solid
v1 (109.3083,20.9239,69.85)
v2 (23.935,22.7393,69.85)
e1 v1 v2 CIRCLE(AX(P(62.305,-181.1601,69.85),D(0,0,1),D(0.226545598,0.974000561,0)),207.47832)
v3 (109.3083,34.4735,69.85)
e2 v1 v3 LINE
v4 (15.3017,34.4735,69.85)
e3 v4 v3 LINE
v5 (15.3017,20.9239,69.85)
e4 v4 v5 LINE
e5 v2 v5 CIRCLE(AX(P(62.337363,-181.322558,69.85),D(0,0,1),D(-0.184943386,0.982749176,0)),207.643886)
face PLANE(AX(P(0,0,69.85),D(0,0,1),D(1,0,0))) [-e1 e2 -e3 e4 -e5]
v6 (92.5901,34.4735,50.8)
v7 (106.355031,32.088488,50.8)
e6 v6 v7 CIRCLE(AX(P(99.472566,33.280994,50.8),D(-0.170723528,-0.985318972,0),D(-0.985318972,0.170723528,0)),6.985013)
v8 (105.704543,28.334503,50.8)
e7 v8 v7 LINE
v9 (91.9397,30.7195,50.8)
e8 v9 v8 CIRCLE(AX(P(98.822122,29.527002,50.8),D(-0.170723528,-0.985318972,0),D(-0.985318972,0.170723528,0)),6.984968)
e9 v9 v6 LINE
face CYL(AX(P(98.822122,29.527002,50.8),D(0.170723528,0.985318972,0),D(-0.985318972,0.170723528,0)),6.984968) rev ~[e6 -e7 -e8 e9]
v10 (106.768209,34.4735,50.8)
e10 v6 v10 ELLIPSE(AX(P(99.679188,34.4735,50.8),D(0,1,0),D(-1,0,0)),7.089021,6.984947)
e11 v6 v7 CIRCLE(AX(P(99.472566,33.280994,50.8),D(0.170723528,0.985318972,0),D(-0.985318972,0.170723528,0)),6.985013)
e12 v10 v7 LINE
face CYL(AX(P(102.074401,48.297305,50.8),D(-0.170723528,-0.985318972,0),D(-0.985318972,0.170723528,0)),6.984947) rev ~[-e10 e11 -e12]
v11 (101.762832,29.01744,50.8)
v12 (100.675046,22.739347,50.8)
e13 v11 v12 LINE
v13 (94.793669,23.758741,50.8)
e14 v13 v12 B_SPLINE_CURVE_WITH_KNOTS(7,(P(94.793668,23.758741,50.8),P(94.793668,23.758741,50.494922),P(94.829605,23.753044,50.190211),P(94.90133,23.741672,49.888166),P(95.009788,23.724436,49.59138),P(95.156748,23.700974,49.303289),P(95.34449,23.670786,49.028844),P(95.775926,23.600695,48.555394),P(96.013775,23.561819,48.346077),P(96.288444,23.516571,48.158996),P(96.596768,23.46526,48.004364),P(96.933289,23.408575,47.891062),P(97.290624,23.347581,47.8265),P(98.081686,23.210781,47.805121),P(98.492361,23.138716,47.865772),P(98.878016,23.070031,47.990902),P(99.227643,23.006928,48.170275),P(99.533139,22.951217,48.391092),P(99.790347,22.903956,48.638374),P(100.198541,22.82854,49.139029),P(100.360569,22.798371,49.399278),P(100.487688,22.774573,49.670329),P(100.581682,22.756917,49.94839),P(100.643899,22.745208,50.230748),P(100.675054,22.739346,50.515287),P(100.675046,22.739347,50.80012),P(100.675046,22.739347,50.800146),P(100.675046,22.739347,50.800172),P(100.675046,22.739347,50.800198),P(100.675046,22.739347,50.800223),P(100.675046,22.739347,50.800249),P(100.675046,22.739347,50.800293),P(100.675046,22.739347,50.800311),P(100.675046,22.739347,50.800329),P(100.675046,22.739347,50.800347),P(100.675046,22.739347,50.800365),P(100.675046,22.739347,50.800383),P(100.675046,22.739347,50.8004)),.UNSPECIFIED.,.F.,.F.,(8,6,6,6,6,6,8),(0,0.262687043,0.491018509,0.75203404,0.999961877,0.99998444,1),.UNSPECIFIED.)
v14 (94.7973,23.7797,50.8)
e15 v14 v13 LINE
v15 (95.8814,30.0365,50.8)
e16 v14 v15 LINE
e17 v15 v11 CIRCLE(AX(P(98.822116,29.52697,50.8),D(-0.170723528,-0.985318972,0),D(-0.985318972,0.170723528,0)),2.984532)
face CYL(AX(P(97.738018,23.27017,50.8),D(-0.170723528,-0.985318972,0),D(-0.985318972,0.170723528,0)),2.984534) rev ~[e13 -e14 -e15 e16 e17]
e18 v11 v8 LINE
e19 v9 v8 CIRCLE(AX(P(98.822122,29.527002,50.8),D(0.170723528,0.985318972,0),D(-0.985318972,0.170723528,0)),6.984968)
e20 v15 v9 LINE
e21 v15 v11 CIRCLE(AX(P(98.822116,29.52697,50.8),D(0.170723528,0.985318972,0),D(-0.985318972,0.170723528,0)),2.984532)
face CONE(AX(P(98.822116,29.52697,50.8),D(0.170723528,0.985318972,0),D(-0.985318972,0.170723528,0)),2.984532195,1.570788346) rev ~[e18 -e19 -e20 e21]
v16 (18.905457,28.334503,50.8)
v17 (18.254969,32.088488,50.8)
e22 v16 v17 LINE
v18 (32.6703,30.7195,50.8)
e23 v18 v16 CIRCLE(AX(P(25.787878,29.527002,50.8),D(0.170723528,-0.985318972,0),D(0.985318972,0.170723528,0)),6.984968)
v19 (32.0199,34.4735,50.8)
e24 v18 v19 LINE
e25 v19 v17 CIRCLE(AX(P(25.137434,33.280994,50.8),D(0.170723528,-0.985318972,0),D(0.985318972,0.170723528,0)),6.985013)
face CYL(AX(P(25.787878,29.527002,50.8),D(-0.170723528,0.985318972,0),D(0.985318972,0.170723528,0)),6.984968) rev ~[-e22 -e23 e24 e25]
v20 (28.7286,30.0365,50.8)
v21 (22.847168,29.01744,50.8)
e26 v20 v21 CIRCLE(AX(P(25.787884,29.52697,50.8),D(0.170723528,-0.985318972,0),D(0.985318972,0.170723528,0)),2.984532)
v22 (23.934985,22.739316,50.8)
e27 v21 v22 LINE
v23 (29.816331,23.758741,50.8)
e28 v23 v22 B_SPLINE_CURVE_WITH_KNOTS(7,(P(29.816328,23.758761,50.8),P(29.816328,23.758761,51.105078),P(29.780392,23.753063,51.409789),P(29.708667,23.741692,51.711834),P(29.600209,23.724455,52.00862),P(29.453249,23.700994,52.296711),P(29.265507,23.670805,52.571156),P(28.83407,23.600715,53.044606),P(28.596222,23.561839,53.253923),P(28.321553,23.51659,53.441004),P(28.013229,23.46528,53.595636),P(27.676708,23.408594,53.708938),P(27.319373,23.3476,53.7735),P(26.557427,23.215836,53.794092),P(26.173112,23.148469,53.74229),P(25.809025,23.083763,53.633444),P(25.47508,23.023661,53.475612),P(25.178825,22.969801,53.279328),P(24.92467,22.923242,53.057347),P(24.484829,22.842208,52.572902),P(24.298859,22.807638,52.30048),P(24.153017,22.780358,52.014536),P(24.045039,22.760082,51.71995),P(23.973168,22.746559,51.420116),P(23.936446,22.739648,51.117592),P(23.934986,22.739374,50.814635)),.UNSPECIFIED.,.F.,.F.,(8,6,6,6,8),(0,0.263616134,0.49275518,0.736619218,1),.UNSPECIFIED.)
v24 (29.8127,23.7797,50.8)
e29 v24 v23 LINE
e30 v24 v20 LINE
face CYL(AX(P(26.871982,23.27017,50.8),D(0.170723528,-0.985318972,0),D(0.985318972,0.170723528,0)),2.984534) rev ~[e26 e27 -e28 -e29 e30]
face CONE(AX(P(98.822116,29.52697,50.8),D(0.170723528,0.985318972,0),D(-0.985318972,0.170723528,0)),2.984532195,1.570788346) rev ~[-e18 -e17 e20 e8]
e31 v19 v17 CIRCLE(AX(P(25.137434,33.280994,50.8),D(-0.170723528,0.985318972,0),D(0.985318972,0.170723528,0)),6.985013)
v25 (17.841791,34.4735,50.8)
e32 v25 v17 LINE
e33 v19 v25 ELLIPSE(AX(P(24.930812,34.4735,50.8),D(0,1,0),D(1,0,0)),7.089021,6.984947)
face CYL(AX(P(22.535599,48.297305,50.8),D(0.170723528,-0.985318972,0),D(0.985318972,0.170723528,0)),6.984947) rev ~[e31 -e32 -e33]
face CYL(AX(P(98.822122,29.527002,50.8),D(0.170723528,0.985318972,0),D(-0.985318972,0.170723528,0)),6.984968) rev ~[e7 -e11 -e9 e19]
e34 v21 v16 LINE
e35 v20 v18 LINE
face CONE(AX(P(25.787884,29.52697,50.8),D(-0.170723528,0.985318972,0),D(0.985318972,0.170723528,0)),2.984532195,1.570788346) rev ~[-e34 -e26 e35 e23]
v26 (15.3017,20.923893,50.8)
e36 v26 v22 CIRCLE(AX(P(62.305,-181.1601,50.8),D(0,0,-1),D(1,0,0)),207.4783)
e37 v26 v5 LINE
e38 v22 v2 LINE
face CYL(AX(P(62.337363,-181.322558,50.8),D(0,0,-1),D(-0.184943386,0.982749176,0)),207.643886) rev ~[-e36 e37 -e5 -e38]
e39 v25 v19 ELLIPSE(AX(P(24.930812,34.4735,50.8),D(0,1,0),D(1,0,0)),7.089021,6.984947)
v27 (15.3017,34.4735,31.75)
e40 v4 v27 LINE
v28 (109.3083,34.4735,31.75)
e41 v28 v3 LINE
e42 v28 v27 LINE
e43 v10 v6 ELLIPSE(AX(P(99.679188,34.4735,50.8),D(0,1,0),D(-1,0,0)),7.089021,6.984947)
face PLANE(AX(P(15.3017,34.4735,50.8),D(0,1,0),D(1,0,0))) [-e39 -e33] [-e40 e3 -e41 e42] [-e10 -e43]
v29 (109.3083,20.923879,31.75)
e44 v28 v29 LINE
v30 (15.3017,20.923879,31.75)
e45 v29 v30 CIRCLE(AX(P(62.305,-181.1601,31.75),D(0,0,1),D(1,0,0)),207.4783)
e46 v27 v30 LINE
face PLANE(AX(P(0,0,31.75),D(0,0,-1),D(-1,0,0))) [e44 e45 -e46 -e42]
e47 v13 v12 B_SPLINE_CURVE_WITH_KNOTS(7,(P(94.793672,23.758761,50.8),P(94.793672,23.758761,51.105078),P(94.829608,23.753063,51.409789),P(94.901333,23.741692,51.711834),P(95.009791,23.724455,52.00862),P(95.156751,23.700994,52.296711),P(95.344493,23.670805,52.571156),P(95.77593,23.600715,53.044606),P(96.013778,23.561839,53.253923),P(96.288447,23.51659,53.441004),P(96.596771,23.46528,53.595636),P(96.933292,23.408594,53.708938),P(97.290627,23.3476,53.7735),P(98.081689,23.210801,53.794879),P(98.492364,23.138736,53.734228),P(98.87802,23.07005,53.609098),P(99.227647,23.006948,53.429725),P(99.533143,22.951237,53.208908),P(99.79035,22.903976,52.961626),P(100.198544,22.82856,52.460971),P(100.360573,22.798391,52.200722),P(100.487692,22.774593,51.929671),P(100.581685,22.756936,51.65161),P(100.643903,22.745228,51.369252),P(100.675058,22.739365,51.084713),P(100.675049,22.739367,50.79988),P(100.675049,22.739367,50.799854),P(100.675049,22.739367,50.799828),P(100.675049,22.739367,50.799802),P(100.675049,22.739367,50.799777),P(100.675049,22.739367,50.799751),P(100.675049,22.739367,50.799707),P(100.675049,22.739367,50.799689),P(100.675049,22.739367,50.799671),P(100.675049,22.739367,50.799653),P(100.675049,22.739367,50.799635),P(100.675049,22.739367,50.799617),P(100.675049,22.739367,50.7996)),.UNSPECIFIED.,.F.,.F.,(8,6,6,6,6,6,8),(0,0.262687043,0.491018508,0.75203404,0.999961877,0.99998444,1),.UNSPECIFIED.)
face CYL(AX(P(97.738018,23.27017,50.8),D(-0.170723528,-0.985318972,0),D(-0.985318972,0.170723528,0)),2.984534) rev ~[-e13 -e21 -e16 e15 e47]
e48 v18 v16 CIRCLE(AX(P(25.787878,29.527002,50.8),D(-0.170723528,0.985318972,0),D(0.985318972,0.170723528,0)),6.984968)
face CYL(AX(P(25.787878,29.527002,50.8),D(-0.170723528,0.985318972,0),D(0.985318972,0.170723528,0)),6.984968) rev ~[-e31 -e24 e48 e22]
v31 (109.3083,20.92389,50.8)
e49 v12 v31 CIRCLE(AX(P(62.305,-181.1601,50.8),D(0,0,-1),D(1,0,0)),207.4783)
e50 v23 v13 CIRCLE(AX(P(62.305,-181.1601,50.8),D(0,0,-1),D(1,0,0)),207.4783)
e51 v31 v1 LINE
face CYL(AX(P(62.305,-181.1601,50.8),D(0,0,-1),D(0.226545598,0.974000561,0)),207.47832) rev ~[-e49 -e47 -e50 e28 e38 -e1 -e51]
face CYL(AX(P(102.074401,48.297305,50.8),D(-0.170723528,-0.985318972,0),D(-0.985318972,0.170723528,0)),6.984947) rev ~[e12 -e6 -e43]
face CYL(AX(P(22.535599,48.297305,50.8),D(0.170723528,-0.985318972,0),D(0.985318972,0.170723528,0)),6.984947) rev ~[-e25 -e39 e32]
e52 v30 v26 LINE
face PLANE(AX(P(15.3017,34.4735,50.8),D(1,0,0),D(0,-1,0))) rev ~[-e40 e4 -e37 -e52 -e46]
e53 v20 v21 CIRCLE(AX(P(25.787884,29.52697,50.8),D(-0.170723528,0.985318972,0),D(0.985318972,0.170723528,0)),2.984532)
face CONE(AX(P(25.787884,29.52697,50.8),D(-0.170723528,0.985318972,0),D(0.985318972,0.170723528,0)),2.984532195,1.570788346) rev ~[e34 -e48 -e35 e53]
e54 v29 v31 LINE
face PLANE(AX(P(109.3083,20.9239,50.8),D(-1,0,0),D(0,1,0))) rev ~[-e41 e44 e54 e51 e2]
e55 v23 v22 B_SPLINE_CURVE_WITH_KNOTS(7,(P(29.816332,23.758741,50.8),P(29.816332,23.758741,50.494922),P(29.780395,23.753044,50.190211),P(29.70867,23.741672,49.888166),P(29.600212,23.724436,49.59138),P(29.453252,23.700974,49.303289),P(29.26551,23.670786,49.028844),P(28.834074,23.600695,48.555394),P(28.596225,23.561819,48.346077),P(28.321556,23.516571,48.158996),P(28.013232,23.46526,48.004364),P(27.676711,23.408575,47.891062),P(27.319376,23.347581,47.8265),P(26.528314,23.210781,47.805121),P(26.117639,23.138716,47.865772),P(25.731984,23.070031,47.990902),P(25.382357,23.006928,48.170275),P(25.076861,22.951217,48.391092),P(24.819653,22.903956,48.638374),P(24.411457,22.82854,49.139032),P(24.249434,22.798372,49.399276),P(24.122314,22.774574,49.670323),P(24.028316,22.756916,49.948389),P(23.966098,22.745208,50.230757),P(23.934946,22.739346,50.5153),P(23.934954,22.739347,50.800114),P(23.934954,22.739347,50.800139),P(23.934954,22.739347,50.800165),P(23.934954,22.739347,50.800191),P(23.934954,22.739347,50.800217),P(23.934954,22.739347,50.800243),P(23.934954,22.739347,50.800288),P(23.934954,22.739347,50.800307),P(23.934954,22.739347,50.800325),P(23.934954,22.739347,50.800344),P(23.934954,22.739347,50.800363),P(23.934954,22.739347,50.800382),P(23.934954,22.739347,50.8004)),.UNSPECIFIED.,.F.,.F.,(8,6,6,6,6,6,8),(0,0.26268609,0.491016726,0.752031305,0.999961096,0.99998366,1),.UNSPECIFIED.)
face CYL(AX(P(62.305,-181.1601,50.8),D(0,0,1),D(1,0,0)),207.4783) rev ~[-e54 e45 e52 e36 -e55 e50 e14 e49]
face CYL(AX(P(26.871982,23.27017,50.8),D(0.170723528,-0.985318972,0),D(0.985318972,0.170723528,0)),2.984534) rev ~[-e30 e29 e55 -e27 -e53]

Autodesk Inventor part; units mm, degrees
ref_plane "YZ Plane" through (0, 0, 0) normal (1, 0, 0) x (0, 1, 0)
ref_plane "XZ Plane" through (0, 0, 0) normal (0, 1, 0) x (-1, 0, 0)
ref_plane "XY Plane" through (0, 0, 0) normal (0, 0, 1) x (1, 0, 0)
sketch "Sketch3" plane through (0, 0, 0) normal (0, 0, 1) x (1, 0, 0)
  line L0 (11.505, 42.3202) -> (113.105, 42.3202)
  line L1 (113.105, 42.3202) -> (113.105, 16.9202)
  line L2 (113.105, 16.9202) -> (11.505, 16.9202)
  line L3 (11.505, 16.9202) -> (11.505, 42.3202)
  point P0 (0, 0)
  dimension "d11" = 101.6
  dimension "d12" = 25.4
extrude "Extrusion1" add sketch "Sketch3" along normal blind 50.8
sketch "Sketch4" plane through (0, 0, 50.8) normal (0, 0, 1) x (1, 0, 0)
  line L0 (11.505, 16.9202) -> (113.105, 16.9202) projected
  line L1 (62.305, 23.2702) -> (62.305, 26.3182)
  line L2 (97.738, 23.2702) -> (26.872, 23.2702)
  circle A0 centre (62.305, -181.1601) radius 207.4783
  point P0 (0, 0)
extrude "Extrusion2" cut sketch "Sketch4" against normal blind 50.8
sketch "Sketch6" plane through (0, 0, 50.8) normal (0, 0, 1) x (1, 0, 0)
  arc A0 (113.105, 20.003) -> (11.505, 20.003) centre (62.305, -181.1601) ccw projected
  line L0 (62.305, 26.3182) -> (62.305, 23.2702)
  line L1 (62.305, 23.2702) -> (26.872, 23.2702)
  line L2 (26.872, 23.2702) -> (97.738, 23.2702)
  arc A1 (97.738, 23.2702) -> (26.872, 23.2702) centre (62.305, -181.1601) ccw
  line L3 (26.872, 23.2702) -> (29.8127, 23.7797)
  line L4 (26.872, 23.2702) -> (29.8565, 23.2702) construction
  line L5 (29.8127, 23.7797) -> (28.7286, 30.0365)
  line L6 (28.7286, 30.0365) -> (32.6703, 30.7195)
  line L7 (32.6703, 30.7195) -> (32.0199, 34.4735)
  line L8 (26.872, 23.2702) -> (22.5356, 48.2973)
  line L9 (26.872, 23.2702) -> (52.272, 23.2702) construction
  line L10 (22.5356, 48.2973) -> (29.418, 49.4898)
  line L11 (29.418, 49.4898) -> (32.0199, 34.4735)
  line L12 (29.8127, 23.7797) -> (29.9804, 22.8117)
  line L13 (29.9804, 22.8117) -> (27.0397, 22.3022)
  line L14 (27.0397, 22.3022) -> (26.872, 23.2702)
  point P0 (0, 0)
  dimension "d39" = 3.048
  dimension "d40" = 35.433
  dimension "d41" = 2.9845
  dimension "d42" = 9.83
  dimension "d43" = 6.35
  dimension "d44" = 90
  dimension "d45" = 4.0005
  dimension "d46" = 90
  dimension "d47" = 3.81
  dimension "d48" = 25.4
  dimension "d49" = 99.83
revolve "Revolution1" cut sketch "Sketch6" angle 360 about axis through (26.872, 23.2702, 50.8) along (-0.1707254, 0.9853186, 0) contours L12 L1 A0 | A0 L3 L12 | L12 L13 L14 L1 | L8 L10 L11 L7 L6 L5 L3
ref_plane "Work Plane2" through (62.305, 42.3202, 50.8) normal (1, 0, 0) x (0, 0, -1)
mirror "Mirror1" about plane through (62.305, 42.3202, 50.8) normal (1, 0, 0) of "Revolution1"
sketch "Sketch7" plane through (0, 0, 50.8) normal (0, 0, 1) x (1, 0, 0)
  line L0 (18.9054, 28.3344) -> (16.4821, 42.3202) projected
  line L1 (18.9054, 28.3344) -> (18.255, 32.0885)
  line L2 (18.255, 32.0885) -> (32.0199, 34.4735)
  line L3 (32.0199, 34.4735) -> (32.6703, 30.7195)
  line L4 (32.0199, 34.4735) -> (113.105, 34.4735)
  line L5 (113.105, 20.003) -> (113.105, 42.3202) projected
  line L6 (16.4821, 42.3202) -> (11.505, 42.3202) projected
  line L7 (113.105, 34.4735) -> (11.505, 34.4735)
  line L8 (11.505, 34.4735) -> (11.505, 42.3202)
  line L9 (11.505, 42.3202) -> (113.105, 42.3202)
  line L10 (113.105, 42.3202) -> (113.105, 34.4735)
  point P0 (0, 0)
  dimension "d52" = 3.81
  dimension "d53" = 13.97
  dimension "d54" = 90
extrude "Extrusion3" cut sketch "Sketch7" against normal blind 50.8 contours L7 L8 L6 L0 | L0 L9 L5 L4 L7
sketch "Sketch8" plane through (0, 0, 50.8) normal (0, 0, 1) x (1, 0, 0)
  line L0 (18.9054, 28.3344) -> (17.8417, 34.4735) projected
  line L1 (17.8417, 34.4735) -> (15.3017, 34.4735)
  line L2 (11.505, 34.4735) -> (113.105, 34.4735) projected
  line L3 (15.3017, 34.4735) -> (15.3017, 16.7671)
  line L4 (15.3017, 16.7671) -> (7.6342, 16.7671)
  line L5 (7.6342, 16.7671) -> (7.6342, 34.4735)
  line L6 (7.6342, 34.4735) -> (15.3017, 34.4735)
  line L7 (62.305, 34.4735) -> (62.305, 19.3718)
  line L8 (109.3083, 34.4735) -> (109.3083, 16.7671)
  line L9 (109.3083, 16.7671) -> (116.9758, 16.7671)
  line L10 (116.9758, 16.7671) -> (116.9758, 34.4735)
  line L11 (116.9758, 34.4735) -> (109.3083, 34.4735)
  point P0 (0, 0)
  dimension "d57" = 2.54
extrude "Extrusion4" cut sketch "Sketch8" against normal blind 50.8
sketch "Sketch9" plane through (0, 0, 0) normal (0, 0, -1) x (-1, 0, 0)
  line L0 (-123.5208, 45.9759) -> (-4.4224, 45.9759)
  line L1 (-4.4224, 45.9759) -> (-4.4224, 6.2764)
  line L2 (-4.4224, 6.2764) -> (-123.5208, 6.2764)
  line L3 (-123.5208, 6.2764) -> (-123.5208, 45.9759)
  point P0 (0, 0)
extrude "Extrusion5" cut sketch "Sketch9" against normal blind 31.75
sketch "Sketch10" plane through (0, 0, 50.8) normal (0, 0, 1) x (1, 0, 0)
  arc A0 (23.935, 22.7393) -> (15.3017, 20.9239) centre (62.305, -181.1601) ccw projected
  line L0 (15.3017, 34.4735) -> (15.3017, 20.9239) projected
  line L1 (15.3017, 20.9239) -> (15.3017, 34.4735)
  line L2 (109.3083, 20.9239) -> (109.3083, 34.4735) projected
  line L3 (15.3017, 34.4735) -> (109.3083, 34.4735)
  line L4 (109.3083, 34.4735) -> (109.3083, 20.9239)
  arc A1 (109.3083, 20.9239) -> (15.3017, 20.9239) centre (62.305, -181.1601) ccw
  point P0 (0, 0)
  point P1 (23.935, 22.7393)
extrude "Extrusion6" add sketch "Sketch10" along normal blind 19.05
mirror "Mirror5" about plane through (62.305, 27.6987, 50.8) normal (0, 0, -1) of "Revolution1", "Mirror1"
properties part number "MountPlateV1"
